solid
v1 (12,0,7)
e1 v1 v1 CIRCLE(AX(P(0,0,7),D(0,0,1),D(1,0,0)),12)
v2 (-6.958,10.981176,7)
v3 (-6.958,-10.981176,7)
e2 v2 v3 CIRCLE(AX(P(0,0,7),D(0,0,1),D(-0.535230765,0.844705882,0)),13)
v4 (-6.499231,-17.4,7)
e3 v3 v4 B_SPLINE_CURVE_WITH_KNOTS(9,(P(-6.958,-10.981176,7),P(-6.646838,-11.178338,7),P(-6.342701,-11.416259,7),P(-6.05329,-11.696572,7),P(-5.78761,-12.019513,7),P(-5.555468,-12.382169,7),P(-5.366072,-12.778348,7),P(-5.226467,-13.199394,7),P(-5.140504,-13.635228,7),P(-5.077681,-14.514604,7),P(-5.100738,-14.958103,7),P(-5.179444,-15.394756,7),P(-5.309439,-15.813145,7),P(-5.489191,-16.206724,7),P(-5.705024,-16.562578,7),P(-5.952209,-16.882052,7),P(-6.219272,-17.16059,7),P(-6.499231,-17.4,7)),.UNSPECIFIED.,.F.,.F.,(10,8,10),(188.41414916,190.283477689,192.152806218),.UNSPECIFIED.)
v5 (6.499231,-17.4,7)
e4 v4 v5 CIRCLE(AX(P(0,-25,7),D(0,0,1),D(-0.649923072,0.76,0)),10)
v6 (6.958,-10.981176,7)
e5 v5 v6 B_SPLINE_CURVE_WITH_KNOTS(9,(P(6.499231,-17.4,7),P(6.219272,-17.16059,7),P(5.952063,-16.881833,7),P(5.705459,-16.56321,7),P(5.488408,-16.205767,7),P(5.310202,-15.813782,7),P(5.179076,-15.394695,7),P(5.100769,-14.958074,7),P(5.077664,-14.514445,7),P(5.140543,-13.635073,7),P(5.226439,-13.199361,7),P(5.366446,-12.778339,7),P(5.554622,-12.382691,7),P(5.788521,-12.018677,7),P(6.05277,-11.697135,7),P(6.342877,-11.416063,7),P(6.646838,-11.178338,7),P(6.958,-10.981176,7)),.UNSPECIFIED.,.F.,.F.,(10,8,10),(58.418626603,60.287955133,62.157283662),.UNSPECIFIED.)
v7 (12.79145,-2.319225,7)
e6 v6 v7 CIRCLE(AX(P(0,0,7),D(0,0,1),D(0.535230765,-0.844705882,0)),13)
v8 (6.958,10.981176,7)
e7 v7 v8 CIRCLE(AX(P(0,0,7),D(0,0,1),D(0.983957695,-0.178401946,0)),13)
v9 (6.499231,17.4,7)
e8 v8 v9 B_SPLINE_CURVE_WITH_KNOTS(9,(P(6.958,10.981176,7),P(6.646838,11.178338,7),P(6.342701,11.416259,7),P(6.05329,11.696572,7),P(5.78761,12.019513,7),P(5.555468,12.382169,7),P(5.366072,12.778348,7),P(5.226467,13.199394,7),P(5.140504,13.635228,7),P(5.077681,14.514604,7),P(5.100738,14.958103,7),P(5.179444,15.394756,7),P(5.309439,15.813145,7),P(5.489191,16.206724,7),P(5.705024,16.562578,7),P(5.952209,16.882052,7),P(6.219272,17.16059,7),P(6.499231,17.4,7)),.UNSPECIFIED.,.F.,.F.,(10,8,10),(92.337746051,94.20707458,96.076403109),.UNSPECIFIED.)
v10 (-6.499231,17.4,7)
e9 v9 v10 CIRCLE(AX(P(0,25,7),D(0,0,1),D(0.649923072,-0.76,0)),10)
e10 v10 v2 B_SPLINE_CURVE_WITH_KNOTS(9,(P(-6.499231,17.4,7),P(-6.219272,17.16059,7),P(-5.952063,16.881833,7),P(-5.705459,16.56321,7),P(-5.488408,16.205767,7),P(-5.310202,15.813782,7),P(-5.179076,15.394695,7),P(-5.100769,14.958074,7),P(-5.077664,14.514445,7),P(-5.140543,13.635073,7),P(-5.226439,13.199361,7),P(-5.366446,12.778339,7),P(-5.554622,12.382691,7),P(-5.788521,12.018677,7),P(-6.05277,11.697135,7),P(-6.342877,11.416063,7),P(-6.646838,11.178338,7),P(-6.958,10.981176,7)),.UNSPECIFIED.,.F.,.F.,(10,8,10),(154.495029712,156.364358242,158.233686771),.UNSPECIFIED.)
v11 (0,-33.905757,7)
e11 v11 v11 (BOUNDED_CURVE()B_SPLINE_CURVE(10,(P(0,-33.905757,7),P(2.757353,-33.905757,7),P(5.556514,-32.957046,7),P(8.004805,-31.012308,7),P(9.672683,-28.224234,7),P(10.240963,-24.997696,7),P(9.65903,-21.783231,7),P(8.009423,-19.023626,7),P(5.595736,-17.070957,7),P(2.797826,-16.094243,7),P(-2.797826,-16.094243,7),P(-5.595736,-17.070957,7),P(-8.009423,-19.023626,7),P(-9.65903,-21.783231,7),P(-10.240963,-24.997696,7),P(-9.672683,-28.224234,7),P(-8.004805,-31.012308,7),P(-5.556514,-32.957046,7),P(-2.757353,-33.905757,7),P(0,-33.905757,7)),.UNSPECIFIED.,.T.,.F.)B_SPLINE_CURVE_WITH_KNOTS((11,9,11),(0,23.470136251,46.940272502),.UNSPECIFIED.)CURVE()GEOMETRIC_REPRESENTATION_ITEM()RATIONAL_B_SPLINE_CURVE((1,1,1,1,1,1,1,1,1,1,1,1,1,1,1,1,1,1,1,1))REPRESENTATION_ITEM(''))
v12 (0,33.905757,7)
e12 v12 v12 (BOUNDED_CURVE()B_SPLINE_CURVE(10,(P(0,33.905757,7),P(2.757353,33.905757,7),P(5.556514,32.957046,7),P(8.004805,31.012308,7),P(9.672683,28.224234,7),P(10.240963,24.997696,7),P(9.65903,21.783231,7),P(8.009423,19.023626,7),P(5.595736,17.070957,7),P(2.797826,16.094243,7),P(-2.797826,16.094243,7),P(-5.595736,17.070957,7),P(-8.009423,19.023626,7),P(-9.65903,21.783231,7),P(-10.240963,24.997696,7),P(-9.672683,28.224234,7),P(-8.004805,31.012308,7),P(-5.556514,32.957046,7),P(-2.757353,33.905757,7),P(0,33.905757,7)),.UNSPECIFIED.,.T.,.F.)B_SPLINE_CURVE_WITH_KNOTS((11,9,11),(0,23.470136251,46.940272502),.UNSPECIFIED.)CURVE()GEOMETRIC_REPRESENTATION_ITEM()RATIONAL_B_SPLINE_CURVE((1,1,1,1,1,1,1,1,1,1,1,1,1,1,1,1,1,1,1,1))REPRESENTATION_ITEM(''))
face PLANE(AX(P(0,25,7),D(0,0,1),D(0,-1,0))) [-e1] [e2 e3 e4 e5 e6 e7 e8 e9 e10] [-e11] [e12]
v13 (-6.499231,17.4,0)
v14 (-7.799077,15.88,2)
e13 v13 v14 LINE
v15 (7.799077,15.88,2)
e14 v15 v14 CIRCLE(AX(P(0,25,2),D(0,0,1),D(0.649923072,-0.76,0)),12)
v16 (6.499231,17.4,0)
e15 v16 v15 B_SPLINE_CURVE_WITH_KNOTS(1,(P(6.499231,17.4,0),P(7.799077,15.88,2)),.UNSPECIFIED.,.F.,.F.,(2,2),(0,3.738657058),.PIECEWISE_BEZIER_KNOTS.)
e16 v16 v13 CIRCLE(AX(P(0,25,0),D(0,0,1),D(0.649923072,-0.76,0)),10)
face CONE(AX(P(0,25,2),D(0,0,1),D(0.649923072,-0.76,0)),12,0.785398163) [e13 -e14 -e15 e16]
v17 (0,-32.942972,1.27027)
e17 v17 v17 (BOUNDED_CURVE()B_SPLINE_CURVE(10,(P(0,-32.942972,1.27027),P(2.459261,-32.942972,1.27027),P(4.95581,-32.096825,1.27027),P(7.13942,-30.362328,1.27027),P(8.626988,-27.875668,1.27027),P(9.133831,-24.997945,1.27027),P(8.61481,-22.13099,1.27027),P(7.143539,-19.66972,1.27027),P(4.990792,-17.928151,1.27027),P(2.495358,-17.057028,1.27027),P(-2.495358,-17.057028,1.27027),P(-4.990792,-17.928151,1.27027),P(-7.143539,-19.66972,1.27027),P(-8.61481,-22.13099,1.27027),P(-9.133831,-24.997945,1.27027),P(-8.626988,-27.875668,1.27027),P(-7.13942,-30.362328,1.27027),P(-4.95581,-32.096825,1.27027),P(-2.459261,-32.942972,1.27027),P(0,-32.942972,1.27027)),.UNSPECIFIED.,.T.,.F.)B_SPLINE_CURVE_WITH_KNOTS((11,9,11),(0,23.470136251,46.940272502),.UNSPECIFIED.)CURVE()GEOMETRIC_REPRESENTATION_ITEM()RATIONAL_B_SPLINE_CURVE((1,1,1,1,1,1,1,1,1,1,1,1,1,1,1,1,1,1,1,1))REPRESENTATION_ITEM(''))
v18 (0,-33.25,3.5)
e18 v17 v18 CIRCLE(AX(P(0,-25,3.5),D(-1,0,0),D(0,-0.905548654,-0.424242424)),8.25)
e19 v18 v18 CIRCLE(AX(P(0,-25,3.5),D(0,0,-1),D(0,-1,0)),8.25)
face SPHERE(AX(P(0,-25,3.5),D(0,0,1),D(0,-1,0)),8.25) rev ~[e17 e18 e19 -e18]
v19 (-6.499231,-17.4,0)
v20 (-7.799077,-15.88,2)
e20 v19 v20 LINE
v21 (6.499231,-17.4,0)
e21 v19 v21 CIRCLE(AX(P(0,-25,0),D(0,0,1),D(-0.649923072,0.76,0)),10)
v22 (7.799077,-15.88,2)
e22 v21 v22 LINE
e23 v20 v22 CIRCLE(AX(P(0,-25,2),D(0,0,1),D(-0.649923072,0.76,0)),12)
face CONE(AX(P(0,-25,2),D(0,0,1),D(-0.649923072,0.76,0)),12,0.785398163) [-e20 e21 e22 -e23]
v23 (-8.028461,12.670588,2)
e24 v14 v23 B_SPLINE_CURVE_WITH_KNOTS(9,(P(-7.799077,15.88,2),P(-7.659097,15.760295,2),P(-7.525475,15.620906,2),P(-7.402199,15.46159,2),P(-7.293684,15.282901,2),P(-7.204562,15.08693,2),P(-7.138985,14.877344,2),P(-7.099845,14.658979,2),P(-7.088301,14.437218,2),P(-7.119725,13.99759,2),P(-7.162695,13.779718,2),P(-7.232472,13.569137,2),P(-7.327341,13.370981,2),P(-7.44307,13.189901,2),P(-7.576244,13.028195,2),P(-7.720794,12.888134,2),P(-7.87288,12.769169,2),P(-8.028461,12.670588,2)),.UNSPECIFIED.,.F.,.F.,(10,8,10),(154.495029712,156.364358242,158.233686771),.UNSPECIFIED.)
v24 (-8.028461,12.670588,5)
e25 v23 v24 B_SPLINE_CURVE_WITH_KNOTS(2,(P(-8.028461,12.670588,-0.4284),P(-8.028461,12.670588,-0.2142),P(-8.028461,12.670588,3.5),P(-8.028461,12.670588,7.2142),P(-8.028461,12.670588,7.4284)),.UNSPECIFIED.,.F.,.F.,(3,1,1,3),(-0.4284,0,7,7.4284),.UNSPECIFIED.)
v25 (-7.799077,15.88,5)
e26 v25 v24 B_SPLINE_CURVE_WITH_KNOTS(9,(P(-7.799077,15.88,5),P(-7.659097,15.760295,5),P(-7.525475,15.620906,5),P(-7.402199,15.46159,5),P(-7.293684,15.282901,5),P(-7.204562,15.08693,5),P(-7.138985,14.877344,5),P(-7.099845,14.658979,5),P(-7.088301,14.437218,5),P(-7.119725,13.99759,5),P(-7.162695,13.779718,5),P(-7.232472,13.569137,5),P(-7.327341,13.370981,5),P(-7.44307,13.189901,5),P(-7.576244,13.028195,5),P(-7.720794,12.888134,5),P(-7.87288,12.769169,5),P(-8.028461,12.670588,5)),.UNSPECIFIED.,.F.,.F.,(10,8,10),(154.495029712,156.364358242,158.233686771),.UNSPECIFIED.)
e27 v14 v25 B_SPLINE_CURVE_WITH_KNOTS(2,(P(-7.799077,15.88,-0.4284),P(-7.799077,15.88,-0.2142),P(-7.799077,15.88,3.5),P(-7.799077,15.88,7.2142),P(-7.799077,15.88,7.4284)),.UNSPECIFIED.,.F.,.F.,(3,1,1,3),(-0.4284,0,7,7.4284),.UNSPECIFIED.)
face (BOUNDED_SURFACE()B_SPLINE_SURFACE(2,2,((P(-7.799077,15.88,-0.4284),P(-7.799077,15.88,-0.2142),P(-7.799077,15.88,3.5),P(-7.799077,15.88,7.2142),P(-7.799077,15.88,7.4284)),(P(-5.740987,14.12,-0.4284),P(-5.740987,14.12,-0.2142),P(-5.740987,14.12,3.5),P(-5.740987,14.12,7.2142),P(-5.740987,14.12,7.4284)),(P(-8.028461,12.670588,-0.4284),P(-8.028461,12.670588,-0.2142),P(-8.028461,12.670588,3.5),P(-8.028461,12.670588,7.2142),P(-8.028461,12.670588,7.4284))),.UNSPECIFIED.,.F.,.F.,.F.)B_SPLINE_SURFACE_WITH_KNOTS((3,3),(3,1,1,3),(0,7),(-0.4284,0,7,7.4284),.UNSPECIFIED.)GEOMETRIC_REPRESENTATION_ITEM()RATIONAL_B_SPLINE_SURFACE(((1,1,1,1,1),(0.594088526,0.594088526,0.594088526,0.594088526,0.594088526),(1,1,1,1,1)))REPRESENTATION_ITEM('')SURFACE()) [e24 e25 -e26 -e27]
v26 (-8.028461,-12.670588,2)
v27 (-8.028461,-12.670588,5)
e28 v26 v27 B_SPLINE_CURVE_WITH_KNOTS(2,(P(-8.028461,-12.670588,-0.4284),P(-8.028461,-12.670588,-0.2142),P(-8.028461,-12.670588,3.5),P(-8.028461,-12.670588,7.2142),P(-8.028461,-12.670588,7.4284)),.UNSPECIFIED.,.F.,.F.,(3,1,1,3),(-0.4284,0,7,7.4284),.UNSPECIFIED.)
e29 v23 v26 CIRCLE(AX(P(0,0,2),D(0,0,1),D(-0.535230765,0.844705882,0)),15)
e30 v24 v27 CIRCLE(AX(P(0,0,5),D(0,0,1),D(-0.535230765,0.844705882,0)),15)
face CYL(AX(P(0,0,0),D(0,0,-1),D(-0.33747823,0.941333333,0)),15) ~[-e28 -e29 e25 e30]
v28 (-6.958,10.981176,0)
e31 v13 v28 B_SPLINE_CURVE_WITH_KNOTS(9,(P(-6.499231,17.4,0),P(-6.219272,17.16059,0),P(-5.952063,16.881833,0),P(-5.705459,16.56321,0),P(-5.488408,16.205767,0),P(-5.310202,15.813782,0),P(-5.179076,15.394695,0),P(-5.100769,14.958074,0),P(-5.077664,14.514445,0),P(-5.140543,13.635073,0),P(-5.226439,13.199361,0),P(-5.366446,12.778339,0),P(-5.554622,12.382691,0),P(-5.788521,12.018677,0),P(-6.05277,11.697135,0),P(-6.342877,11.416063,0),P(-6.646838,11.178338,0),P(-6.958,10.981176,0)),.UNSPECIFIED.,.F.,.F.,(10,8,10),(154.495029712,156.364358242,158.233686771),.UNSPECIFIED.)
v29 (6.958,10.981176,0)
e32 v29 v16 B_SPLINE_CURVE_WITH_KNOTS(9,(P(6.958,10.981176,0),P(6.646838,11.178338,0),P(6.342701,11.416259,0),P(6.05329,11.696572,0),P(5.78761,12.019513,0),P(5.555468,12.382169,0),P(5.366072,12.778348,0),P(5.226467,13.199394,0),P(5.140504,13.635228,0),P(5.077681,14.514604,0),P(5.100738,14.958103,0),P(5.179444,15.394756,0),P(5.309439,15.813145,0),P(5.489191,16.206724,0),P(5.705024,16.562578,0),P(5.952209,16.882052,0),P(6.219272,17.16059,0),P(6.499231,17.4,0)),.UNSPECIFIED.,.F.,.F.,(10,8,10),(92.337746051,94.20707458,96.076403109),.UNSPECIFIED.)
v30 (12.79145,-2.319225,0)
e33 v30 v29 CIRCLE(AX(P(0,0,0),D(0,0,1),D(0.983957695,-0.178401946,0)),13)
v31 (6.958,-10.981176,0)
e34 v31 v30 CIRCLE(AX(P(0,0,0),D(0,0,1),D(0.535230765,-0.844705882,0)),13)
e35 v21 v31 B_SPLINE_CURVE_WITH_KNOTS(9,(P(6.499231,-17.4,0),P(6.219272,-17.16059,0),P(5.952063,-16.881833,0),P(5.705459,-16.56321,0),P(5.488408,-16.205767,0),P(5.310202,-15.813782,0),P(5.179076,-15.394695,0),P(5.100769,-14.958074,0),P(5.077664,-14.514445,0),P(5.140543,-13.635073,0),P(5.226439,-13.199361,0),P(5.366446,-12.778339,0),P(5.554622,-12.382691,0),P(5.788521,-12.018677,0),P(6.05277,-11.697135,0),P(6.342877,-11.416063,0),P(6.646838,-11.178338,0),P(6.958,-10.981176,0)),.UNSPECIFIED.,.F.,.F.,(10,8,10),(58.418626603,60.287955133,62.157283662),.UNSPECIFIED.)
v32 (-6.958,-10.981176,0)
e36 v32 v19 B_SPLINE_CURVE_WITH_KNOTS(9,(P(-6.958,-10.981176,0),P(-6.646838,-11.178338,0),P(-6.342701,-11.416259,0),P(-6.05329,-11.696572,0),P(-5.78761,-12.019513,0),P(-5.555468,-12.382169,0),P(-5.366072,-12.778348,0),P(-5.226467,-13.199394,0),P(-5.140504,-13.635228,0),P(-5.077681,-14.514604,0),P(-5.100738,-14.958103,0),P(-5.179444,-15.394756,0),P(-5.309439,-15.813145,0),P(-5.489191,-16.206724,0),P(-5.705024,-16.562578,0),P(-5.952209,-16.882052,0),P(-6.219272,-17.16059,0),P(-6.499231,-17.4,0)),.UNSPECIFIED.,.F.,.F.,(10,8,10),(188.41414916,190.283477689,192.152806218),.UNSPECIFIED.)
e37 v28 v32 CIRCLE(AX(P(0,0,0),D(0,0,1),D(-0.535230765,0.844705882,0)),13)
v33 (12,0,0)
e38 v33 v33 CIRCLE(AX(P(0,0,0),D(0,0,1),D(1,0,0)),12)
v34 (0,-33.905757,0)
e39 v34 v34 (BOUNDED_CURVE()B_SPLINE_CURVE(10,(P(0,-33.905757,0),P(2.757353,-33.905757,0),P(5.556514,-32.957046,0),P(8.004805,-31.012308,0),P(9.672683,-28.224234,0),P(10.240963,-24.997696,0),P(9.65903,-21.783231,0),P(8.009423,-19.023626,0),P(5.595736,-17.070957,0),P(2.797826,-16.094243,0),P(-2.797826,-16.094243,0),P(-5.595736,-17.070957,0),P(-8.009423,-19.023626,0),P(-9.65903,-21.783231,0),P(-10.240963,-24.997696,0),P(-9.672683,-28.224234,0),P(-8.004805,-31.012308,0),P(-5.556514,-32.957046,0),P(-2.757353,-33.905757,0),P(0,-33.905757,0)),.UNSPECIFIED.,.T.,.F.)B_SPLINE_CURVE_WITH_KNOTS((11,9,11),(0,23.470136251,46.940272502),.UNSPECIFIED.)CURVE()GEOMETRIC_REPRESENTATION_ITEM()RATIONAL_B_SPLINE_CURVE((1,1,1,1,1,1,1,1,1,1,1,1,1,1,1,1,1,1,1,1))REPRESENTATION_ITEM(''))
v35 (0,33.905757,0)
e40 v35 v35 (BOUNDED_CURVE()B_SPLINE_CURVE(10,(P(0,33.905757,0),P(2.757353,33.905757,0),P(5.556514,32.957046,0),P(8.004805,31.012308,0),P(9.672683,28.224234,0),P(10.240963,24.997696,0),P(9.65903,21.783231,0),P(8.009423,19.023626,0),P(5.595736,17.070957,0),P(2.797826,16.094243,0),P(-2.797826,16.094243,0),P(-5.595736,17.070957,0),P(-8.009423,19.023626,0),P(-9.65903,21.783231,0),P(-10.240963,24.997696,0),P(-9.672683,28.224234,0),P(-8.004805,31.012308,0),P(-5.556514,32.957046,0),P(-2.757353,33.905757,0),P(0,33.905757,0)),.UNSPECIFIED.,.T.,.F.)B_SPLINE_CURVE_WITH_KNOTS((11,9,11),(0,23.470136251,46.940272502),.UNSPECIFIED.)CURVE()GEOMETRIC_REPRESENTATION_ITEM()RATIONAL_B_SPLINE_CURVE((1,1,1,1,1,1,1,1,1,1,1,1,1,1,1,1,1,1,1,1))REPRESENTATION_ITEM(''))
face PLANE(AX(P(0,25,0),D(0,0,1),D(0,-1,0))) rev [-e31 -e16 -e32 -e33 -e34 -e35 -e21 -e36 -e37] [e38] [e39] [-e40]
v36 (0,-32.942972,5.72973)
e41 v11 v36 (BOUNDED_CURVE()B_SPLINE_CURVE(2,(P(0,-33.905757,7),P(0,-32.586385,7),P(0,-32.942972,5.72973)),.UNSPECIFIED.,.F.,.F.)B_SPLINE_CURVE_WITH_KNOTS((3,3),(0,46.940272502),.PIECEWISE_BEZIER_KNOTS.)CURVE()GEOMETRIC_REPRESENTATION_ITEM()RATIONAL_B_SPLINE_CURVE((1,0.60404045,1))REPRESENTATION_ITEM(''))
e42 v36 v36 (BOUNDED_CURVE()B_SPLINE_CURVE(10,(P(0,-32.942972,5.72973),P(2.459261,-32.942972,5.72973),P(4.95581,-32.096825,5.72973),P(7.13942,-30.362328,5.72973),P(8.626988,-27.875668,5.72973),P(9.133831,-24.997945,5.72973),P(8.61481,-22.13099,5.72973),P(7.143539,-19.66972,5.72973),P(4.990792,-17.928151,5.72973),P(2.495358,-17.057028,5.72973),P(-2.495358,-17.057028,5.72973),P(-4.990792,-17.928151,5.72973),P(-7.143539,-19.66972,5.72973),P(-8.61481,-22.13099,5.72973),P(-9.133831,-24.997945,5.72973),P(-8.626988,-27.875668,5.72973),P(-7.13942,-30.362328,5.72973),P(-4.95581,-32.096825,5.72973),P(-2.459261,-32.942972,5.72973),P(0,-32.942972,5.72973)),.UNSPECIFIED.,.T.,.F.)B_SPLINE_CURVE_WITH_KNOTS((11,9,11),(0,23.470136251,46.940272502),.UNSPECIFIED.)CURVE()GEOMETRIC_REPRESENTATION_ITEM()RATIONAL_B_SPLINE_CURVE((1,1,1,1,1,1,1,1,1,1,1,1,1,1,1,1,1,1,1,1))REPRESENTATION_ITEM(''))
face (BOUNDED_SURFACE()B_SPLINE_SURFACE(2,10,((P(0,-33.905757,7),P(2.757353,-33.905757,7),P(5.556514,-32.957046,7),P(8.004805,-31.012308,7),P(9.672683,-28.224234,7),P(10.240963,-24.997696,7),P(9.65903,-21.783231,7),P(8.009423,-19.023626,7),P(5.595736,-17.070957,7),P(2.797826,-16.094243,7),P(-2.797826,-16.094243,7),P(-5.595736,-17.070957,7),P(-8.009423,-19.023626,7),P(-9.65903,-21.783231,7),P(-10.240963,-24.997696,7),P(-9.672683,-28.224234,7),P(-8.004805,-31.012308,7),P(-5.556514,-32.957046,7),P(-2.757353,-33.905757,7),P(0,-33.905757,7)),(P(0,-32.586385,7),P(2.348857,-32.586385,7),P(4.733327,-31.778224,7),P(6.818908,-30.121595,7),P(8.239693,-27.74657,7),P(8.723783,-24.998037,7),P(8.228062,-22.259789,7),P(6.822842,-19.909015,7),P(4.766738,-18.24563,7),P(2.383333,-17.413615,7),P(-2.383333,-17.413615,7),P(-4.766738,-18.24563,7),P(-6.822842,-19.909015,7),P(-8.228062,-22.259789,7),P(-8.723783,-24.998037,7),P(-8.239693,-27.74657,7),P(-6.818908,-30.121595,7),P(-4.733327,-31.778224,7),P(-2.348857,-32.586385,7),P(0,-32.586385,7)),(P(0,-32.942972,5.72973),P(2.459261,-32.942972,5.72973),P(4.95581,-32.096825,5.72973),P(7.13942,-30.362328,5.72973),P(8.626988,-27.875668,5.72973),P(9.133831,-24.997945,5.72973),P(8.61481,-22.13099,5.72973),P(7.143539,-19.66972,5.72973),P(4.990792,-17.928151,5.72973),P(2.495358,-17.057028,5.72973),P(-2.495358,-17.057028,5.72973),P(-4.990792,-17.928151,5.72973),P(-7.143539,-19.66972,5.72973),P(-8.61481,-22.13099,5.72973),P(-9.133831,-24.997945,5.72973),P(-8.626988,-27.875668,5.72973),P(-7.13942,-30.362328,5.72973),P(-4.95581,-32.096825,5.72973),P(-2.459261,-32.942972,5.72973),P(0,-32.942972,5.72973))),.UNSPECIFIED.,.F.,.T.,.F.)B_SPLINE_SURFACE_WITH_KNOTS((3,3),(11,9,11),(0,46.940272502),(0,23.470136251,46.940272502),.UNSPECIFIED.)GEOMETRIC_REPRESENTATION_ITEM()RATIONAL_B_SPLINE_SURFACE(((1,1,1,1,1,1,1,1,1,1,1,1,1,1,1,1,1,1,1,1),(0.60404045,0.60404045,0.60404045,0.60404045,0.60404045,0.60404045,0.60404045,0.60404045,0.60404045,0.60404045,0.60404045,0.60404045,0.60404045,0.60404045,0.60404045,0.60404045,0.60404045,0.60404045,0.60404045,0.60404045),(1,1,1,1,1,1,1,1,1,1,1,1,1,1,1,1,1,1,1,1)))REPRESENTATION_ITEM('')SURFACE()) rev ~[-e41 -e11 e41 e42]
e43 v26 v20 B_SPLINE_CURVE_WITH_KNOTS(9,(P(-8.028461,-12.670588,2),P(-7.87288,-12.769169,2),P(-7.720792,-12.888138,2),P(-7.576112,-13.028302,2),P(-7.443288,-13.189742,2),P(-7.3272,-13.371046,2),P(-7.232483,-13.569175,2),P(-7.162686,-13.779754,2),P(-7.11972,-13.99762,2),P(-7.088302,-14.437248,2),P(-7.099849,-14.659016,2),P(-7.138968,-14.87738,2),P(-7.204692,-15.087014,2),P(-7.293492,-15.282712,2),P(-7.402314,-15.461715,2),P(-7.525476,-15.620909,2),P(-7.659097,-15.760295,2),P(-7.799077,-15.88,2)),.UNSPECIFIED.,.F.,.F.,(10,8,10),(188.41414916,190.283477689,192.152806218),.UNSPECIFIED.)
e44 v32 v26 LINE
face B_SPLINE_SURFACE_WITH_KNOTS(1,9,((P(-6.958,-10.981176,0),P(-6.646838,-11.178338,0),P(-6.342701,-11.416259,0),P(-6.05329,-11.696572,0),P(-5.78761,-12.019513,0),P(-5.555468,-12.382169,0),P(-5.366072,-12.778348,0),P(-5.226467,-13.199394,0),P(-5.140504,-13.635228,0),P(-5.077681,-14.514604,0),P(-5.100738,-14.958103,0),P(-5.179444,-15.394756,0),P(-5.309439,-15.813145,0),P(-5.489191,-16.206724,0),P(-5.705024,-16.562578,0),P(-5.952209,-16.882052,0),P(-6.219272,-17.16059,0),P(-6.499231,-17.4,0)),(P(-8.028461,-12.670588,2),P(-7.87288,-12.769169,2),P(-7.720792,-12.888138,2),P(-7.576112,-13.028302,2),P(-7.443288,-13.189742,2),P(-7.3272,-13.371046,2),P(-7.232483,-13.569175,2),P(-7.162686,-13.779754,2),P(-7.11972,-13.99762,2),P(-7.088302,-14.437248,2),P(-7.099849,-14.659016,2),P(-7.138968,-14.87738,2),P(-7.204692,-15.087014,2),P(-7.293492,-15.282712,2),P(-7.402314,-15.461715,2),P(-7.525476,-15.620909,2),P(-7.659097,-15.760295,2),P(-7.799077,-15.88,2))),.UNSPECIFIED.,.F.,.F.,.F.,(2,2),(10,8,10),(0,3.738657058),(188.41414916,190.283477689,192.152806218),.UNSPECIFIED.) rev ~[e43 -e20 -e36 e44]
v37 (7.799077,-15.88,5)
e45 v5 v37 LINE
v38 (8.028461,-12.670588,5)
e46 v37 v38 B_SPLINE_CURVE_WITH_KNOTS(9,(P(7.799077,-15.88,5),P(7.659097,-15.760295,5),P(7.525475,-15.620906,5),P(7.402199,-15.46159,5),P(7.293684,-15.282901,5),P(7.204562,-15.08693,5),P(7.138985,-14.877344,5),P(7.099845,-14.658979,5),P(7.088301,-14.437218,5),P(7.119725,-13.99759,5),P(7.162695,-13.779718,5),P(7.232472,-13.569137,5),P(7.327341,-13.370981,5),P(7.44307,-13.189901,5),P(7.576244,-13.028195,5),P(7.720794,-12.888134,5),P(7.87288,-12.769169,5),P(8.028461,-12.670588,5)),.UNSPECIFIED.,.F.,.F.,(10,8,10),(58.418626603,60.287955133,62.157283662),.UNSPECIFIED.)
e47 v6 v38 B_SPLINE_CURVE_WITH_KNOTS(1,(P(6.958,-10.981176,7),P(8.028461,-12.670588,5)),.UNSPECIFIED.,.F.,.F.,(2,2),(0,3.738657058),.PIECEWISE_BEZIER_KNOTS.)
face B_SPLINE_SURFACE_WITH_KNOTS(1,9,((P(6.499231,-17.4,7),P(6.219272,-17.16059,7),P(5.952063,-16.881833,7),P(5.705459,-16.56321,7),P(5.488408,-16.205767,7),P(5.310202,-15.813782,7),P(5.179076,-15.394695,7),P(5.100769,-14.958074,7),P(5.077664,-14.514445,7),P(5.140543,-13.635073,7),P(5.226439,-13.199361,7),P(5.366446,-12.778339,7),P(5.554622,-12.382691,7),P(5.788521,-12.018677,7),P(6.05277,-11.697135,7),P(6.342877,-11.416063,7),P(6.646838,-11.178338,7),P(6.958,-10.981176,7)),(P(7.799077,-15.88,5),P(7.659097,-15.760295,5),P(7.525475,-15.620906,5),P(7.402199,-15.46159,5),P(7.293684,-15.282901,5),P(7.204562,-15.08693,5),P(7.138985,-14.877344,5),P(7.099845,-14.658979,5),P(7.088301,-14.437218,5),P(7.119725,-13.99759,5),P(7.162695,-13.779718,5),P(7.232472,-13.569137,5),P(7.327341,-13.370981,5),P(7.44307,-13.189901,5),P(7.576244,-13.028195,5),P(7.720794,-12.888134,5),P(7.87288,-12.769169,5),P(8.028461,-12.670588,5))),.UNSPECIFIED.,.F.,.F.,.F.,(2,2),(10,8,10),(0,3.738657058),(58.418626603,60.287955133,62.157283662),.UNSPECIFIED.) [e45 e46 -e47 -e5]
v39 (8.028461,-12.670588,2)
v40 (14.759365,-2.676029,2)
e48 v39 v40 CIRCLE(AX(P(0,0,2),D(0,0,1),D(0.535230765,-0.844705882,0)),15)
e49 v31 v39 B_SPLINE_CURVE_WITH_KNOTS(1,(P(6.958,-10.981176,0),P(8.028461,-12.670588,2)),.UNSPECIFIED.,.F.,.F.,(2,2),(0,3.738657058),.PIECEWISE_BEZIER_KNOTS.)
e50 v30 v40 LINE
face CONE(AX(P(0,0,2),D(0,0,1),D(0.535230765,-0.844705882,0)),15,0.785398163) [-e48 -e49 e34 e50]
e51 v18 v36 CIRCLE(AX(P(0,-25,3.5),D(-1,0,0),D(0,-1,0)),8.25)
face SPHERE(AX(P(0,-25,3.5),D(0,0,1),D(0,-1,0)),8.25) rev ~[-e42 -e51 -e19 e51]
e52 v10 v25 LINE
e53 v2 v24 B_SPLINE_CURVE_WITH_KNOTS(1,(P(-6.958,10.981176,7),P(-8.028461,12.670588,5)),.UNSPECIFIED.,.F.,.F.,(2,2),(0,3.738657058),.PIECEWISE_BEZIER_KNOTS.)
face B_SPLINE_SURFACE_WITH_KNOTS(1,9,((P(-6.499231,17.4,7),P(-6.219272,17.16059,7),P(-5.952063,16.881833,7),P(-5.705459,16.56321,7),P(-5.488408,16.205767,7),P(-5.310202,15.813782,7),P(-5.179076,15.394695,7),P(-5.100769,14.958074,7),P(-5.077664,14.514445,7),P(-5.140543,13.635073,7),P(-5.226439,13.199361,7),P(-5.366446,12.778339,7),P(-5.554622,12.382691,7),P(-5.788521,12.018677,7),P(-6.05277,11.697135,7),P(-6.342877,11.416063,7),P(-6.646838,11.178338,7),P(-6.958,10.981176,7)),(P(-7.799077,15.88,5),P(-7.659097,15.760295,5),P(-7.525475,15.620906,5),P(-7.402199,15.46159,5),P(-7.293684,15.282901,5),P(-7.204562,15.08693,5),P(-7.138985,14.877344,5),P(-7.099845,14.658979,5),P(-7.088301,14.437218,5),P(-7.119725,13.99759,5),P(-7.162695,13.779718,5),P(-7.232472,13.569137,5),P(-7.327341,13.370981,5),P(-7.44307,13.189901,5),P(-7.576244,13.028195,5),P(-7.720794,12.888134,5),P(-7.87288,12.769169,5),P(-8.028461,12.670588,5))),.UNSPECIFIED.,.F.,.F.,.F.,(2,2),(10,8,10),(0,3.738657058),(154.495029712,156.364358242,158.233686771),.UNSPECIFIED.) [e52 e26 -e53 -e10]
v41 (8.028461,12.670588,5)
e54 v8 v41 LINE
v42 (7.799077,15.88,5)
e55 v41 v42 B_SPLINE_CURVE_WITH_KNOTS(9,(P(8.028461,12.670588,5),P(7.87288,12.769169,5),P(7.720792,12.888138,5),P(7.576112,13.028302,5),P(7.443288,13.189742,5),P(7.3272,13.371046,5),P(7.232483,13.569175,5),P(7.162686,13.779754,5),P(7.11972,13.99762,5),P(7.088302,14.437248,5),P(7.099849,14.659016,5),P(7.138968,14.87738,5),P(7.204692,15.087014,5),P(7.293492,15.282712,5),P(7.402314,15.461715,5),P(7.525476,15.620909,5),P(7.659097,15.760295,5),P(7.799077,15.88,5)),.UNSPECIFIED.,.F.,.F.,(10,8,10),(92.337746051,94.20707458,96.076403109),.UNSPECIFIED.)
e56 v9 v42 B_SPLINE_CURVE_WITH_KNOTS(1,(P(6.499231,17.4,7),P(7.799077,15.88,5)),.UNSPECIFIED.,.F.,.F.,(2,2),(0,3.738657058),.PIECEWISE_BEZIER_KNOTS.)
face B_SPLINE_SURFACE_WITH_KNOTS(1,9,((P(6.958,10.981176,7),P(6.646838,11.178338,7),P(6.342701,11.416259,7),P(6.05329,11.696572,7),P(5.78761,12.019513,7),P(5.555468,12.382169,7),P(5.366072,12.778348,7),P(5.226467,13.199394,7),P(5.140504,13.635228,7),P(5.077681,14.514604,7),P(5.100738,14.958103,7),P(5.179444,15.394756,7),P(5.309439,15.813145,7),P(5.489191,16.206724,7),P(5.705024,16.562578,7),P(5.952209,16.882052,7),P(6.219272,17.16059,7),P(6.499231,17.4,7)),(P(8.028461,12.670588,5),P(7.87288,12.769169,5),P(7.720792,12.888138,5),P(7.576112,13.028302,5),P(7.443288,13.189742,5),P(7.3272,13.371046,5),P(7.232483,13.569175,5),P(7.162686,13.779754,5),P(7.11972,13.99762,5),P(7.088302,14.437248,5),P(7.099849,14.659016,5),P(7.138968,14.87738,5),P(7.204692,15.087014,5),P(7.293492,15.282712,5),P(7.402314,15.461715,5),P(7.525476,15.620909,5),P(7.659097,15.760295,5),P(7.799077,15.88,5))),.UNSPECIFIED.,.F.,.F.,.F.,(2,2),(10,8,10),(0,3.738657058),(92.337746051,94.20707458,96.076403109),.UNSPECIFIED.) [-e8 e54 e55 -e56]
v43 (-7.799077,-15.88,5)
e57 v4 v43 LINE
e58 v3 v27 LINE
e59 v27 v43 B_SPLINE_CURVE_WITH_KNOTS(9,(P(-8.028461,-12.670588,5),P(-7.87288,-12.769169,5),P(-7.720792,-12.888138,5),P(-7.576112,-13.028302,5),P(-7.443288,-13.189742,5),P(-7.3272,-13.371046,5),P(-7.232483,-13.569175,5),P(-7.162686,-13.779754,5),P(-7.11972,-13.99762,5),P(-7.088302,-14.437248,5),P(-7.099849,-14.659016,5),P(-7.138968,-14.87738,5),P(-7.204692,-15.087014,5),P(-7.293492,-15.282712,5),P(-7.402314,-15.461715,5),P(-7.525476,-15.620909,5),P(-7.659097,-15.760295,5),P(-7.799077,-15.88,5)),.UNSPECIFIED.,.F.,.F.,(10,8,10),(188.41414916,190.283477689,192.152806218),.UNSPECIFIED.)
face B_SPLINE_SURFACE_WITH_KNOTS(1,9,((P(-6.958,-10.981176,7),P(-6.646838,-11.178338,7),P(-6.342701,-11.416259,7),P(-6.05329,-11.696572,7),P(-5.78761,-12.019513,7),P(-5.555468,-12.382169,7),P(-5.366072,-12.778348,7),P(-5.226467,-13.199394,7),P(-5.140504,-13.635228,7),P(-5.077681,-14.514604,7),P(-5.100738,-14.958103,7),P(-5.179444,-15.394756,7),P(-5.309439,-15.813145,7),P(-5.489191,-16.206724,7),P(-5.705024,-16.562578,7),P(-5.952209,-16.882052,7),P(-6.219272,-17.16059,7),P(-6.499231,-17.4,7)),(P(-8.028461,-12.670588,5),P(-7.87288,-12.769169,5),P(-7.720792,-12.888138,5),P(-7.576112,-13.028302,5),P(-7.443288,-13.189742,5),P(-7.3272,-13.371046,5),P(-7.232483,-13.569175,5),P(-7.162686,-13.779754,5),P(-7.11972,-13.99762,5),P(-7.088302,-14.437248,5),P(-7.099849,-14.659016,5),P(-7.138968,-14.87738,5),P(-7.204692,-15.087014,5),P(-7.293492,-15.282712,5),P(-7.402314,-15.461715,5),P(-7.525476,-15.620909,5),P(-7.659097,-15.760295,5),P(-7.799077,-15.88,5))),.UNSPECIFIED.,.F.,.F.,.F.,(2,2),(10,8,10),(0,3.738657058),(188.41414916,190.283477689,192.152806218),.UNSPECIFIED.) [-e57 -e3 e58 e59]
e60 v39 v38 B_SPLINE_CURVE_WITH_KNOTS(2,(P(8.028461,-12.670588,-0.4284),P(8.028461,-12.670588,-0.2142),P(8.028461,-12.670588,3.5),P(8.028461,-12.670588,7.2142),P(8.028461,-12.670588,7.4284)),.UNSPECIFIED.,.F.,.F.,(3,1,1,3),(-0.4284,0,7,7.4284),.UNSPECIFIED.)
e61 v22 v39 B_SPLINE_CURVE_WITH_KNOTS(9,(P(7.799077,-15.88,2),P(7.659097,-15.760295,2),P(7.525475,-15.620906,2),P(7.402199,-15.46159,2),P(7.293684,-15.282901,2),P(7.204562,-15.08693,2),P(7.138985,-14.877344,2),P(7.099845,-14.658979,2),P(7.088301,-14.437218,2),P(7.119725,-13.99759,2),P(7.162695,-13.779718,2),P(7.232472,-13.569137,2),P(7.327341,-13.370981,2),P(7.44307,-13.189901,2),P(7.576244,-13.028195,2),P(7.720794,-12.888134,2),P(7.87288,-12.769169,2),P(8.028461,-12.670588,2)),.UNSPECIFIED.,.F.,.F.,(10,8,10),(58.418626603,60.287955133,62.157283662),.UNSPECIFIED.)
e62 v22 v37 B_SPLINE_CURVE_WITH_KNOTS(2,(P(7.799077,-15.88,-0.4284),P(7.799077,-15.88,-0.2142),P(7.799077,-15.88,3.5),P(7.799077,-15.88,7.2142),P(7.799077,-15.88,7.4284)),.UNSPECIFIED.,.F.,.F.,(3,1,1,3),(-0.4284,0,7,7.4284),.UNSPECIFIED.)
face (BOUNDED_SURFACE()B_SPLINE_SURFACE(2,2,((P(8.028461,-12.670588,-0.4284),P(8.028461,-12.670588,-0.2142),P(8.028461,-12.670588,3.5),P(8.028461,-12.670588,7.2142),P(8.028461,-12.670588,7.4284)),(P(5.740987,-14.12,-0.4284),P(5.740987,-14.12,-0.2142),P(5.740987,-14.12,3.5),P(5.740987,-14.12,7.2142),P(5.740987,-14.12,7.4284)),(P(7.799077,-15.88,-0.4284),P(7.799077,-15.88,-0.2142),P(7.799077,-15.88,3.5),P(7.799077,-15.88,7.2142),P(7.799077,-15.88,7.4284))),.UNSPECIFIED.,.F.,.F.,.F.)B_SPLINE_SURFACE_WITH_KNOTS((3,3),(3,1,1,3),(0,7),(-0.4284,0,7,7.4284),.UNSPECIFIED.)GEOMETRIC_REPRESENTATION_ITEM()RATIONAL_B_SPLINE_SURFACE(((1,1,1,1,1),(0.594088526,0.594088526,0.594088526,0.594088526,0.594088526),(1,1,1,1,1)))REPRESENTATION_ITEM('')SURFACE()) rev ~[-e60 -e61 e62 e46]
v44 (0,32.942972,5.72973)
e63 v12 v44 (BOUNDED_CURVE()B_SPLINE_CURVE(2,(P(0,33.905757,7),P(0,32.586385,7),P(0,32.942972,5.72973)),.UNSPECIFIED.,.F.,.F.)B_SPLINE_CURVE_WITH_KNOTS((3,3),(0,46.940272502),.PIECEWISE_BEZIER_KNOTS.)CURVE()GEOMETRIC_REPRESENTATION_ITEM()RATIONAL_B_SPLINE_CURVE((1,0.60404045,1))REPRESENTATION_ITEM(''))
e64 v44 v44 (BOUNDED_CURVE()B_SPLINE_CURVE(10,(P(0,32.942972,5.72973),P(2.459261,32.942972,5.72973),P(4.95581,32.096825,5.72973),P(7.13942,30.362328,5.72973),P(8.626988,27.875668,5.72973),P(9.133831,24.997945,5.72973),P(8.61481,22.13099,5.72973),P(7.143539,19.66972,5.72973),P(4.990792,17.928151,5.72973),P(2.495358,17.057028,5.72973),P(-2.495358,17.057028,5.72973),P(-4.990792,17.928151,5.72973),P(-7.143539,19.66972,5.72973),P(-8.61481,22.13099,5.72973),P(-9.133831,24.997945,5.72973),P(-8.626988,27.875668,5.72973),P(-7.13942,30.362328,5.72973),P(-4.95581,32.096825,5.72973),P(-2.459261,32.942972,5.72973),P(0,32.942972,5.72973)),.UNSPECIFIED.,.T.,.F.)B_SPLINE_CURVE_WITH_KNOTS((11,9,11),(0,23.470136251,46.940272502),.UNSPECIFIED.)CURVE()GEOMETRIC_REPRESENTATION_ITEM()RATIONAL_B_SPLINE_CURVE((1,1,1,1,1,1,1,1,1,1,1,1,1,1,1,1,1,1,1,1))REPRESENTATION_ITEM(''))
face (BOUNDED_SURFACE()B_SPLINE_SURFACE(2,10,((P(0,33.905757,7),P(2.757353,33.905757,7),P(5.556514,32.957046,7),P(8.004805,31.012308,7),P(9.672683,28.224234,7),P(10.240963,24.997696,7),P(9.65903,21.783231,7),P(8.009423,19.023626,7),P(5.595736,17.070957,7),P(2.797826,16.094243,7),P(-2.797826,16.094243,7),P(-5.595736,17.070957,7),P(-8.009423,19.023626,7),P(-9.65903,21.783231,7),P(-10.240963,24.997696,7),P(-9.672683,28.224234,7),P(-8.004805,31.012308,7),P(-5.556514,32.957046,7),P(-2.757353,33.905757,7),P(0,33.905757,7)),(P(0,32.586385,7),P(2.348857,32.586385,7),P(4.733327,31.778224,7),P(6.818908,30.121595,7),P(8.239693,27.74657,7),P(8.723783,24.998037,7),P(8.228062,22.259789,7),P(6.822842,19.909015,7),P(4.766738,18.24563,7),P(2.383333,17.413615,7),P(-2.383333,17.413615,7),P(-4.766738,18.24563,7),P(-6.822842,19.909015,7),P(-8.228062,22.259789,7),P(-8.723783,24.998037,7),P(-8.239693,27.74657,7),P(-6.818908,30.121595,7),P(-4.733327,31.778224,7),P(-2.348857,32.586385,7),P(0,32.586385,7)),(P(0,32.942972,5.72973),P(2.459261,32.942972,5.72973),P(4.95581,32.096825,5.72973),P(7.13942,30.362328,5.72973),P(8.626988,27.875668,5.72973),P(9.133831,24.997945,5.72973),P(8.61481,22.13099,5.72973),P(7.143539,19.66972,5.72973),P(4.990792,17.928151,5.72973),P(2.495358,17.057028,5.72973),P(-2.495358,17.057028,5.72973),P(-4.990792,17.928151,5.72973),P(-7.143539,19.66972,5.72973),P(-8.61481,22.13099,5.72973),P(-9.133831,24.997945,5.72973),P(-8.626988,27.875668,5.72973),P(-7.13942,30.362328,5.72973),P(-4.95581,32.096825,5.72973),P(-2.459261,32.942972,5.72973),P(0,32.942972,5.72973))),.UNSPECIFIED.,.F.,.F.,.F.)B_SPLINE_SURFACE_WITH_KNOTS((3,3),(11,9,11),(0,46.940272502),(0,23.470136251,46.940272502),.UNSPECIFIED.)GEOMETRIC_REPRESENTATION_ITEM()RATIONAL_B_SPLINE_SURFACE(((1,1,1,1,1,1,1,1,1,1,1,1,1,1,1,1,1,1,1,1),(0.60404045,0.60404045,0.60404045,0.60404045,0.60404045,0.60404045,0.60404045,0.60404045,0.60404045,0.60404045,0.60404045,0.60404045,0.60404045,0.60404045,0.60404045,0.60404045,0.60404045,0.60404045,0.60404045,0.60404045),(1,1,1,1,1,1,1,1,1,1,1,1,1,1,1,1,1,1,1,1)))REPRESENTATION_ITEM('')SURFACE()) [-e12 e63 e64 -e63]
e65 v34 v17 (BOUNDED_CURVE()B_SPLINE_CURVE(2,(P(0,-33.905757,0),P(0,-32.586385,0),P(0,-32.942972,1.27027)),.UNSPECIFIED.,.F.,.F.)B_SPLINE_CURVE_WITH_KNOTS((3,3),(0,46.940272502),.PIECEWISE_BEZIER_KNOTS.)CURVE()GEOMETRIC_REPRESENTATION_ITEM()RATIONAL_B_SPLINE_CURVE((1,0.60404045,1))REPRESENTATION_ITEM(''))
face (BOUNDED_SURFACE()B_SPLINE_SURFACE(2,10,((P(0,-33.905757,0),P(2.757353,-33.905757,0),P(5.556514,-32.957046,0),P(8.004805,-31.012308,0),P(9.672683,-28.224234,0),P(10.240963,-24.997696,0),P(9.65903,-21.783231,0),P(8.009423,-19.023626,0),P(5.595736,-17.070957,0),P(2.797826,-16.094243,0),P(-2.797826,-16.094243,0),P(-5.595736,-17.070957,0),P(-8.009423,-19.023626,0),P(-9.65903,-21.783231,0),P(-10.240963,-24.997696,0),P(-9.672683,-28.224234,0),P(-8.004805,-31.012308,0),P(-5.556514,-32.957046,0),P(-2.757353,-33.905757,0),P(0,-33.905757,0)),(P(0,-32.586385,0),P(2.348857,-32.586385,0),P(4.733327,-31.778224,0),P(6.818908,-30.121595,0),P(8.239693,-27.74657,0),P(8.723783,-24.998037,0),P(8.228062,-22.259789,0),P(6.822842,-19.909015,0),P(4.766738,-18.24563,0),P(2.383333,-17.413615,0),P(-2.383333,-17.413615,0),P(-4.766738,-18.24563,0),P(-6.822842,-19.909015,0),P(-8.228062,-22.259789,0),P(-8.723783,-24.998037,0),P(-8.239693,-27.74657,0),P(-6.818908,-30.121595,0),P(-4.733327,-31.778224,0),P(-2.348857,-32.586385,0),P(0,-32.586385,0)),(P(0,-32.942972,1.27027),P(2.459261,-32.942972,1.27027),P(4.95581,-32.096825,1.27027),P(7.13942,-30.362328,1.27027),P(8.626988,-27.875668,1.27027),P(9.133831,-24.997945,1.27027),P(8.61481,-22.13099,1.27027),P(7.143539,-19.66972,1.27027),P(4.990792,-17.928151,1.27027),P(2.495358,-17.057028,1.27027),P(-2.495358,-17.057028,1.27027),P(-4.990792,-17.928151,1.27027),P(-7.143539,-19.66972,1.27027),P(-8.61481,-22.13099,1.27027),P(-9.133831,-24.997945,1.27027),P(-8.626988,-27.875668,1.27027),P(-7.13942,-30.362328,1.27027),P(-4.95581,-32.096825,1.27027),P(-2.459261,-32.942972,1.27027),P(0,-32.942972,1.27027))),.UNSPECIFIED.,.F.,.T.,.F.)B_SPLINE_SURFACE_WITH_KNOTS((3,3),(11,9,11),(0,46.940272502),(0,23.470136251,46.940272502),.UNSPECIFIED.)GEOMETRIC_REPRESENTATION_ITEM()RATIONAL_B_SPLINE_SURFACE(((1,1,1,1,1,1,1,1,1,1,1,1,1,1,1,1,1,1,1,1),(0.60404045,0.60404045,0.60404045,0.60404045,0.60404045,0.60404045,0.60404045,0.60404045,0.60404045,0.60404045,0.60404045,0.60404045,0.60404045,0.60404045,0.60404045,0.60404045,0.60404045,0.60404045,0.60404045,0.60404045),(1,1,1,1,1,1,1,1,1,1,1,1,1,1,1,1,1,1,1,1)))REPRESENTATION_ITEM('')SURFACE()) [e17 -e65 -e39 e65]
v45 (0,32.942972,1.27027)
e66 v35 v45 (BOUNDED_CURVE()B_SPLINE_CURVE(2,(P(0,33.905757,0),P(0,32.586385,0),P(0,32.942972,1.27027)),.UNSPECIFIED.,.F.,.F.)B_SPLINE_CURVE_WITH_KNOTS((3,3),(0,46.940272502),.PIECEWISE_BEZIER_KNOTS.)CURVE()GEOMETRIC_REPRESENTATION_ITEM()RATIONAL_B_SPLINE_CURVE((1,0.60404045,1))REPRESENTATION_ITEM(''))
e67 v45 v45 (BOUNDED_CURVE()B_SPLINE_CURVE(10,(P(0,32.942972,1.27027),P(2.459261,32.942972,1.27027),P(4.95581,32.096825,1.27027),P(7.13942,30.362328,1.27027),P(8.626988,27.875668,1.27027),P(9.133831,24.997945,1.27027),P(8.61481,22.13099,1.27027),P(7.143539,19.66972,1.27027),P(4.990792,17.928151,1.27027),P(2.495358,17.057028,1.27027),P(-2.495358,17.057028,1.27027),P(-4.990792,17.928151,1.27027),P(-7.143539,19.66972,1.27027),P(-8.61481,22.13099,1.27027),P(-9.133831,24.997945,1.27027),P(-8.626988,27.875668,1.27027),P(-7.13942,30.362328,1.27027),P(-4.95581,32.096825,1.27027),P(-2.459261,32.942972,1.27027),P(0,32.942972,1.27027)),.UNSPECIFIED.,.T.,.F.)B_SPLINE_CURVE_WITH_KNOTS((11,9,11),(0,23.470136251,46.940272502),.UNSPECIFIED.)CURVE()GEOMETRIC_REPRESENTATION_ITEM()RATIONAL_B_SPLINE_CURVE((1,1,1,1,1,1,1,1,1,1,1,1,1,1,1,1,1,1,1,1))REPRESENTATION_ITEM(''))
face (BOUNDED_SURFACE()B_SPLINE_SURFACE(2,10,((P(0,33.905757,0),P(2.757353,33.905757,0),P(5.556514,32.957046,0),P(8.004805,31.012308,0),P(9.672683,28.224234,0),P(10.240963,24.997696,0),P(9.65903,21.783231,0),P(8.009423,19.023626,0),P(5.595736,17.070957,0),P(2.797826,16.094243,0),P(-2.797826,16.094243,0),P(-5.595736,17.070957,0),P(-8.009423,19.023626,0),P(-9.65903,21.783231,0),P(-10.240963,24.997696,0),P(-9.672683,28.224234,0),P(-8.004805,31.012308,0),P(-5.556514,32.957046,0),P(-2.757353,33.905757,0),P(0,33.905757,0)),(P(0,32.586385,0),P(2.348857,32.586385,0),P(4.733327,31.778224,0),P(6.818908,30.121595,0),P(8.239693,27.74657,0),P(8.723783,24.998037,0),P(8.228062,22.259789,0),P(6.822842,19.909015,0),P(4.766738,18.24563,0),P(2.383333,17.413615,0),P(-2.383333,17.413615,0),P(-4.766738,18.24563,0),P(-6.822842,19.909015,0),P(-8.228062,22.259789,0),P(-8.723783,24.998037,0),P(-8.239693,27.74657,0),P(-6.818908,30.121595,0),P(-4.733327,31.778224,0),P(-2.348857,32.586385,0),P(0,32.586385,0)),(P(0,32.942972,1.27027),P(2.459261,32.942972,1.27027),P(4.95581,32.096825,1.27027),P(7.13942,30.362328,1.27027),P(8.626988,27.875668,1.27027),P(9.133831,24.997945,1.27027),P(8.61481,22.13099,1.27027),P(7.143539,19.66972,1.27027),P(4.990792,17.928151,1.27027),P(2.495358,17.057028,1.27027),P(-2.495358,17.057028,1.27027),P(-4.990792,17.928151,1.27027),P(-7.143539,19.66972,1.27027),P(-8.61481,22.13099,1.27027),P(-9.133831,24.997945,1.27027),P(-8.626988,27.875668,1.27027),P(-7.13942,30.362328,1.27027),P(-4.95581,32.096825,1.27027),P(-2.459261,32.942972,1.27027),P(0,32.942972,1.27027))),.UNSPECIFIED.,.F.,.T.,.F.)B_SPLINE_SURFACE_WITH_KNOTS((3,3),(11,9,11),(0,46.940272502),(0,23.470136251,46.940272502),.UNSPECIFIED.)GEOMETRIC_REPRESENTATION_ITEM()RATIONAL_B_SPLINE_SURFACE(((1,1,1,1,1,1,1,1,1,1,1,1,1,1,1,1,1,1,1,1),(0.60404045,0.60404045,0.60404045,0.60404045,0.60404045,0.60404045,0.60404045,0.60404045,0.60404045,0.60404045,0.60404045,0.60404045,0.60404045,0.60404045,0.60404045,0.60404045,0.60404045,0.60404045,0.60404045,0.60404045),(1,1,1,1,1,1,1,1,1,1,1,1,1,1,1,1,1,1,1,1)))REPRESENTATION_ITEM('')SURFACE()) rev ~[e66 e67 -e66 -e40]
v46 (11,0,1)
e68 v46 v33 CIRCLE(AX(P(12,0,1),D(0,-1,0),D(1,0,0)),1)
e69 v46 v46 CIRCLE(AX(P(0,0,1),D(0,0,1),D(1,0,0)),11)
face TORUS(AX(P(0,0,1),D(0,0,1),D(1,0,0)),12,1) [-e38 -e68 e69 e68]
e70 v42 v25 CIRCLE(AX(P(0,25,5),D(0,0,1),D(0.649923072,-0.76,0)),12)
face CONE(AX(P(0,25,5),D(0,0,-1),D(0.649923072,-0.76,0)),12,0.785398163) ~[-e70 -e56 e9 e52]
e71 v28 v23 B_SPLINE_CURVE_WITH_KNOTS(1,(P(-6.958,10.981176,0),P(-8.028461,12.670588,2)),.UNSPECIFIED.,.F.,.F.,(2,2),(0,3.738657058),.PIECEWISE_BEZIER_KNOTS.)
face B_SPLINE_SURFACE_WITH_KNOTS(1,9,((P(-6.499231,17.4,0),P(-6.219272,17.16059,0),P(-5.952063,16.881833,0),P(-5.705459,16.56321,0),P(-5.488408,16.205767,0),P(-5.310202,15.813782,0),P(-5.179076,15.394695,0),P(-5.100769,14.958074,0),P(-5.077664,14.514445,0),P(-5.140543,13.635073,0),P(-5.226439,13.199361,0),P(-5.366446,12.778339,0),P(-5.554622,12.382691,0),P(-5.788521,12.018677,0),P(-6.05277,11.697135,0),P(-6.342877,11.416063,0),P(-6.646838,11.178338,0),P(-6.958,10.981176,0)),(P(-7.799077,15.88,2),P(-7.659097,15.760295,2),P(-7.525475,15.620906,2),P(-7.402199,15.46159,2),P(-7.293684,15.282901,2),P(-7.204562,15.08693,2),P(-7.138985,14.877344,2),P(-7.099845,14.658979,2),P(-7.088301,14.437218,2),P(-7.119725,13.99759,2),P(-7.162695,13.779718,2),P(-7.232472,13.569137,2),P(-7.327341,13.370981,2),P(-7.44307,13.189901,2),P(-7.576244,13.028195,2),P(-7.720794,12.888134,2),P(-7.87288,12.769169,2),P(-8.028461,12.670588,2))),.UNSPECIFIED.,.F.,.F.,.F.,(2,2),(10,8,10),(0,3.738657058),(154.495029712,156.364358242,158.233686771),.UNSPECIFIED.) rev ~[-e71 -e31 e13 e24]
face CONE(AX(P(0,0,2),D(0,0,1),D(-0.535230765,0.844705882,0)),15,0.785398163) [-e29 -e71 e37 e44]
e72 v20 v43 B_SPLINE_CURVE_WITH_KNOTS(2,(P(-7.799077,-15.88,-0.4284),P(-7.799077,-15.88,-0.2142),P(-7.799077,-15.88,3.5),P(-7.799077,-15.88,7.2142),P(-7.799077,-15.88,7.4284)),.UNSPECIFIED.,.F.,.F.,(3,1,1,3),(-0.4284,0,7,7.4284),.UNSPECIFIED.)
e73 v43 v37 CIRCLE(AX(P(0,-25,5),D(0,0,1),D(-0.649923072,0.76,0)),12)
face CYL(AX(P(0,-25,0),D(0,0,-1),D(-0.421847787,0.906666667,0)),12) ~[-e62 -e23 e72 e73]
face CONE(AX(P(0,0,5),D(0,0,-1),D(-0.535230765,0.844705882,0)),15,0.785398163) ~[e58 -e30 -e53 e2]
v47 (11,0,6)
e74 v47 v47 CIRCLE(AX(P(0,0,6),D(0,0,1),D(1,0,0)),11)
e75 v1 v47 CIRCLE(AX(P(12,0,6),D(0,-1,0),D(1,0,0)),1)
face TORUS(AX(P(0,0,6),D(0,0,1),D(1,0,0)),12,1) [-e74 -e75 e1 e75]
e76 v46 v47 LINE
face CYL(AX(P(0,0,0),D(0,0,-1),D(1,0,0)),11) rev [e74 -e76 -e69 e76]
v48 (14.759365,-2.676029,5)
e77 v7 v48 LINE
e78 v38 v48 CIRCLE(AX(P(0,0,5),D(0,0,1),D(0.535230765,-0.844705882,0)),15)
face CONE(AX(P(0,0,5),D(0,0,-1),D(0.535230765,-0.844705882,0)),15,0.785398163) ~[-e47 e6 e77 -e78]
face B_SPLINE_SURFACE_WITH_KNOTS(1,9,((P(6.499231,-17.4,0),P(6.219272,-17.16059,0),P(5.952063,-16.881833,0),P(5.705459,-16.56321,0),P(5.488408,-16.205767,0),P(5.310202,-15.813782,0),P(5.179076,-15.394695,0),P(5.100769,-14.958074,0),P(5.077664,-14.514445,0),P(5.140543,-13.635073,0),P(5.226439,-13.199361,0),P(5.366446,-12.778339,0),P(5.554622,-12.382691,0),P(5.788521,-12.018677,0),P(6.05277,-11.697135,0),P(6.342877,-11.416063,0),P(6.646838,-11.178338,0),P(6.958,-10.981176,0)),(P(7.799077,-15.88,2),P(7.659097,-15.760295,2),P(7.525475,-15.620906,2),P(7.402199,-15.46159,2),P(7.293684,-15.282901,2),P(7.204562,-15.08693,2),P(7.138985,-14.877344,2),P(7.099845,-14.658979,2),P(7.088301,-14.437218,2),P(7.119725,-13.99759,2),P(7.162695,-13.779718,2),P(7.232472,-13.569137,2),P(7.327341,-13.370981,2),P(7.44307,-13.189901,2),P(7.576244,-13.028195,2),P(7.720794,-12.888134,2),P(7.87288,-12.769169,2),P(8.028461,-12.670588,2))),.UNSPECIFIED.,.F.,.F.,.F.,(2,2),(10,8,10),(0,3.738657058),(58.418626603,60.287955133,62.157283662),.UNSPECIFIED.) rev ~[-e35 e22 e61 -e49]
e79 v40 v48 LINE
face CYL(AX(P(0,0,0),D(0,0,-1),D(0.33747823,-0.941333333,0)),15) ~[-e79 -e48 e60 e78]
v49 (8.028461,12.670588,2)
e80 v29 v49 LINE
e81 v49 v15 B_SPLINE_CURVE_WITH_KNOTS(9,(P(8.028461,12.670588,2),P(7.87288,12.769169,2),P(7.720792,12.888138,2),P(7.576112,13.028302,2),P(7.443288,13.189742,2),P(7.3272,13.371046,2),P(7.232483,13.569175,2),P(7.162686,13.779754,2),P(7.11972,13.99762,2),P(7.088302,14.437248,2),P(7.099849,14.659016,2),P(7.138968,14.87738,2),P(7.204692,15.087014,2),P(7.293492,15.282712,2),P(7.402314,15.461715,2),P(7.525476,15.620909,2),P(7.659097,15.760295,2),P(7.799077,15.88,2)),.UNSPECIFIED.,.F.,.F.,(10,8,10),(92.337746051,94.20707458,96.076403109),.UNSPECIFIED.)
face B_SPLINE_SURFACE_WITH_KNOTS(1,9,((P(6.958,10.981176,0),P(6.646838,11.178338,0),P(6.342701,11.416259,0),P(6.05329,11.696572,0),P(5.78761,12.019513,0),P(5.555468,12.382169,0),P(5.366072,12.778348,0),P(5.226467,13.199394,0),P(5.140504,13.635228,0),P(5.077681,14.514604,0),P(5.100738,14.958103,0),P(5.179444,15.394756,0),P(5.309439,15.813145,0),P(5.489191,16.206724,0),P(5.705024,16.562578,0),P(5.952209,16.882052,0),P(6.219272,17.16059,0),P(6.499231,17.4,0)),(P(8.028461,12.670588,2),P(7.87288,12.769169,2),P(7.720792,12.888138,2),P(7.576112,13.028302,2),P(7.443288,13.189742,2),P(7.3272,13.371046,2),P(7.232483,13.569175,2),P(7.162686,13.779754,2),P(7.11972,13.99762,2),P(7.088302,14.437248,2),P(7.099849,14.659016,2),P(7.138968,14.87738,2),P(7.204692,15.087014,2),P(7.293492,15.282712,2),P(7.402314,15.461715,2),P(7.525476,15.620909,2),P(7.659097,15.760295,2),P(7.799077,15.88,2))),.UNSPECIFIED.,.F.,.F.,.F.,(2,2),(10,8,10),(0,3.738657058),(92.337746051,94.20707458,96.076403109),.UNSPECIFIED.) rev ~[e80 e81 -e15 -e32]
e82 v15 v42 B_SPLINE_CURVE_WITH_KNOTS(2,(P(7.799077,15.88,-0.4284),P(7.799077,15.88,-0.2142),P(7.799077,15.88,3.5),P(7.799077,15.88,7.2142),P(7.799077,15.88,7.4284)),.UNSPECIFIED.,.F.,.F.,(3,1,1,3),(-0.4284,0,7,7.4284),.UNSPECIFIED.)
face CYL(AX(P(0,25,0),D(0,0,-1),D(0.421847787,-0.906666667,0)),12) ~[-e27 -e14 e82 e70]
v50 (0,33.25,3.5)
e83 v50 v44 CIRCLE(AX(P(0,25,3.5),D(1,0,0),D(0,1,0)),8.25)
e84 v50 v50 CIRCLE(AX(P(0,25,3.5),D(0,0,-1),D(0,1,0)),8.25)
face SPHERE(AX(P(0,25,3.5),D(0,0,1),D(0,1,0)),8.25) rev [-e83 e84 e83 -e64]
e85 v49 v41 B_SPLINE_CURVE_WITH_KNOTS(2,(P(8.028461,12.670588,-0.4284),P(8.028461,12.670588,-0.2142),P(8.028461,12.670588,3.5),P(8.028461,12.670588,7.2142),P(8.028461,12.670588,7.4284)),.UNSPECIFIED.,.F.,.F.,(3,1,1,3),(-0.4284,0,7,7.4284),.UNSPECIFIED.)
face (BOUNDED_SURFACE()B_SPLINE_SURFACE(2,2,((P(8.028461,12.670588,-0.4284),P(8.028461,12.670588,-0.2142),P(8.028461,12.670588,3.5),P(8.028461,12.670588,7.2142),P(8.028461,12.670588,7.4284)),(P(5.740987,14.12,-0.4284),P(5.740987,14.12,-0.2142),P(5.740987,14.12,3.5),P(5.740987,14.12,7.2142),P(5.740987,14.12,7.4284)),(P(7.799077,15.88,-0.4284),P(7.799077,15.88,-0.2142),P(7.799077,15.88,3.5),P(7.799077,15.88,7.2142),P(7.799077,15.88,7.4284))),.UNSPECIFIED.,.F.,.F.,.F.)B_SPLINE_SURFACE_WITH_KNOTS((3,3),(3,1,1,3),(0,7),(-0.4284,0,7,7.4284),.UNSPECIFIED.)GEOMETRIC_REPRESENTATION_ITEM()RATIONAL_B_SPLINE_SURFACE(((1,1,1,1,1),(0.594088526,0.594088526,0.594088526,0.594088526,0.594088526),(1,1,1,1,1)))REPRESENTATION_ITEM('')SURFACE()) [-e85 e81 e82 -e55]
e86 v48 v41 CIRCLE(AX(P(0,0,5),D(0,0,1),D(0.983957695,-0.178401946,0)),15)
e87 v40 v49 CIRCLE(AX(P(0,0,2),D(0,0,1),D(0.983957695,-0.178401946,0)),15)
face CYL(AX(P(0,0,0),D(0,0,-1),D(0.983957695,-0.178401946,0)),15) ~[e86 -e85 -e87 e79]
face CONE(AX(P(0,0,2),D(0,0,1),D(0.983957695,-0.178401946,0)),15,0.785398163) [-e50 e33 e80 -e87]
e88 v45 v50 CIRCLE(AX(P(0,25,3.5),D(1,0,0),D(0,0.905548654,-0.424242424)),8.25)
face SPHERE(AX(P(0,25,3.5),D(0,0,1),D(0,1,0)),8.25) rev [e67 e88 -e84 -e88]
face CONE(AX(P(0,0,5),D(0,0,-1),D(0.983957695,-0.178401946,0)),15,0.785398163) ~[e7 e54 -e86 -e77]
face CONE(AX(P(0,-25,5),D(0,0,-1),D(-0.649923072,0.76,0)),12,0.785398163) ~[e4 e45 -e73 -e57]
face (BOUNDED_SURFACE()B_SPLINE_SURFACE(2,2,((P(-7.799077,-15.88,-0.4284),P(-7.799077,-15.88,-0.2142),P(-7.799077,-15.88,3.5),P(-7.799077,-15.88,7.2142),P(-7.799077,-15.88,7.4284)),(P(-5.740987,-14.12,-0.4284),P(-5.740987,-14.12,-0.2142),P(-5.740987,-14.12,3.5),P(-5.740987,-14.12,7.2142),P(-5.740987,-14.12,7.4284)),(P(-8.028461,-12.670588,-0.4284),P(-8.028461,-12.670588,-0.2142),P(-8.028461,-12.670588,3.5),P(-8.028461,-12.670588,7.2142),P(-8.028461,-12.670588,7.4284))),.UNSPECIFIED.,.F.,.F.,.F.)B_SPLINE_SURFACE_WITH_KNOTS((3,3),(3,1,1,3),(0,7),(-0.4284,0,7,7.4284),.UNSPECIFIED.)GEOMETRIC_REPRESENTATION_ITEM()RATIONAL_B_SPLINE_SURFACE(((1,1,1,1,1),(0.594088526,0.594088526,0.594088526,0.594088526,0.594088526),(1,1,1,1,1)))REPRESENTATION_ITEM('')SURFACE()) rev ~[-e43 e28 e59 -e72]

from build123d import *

# Parameters (mm, degrees)
F0_R     = 8.25
F0_R_2   = 11
F1_DEPTH = 7
F2_R     = 2
F3_SIZE  = 2
F9_R     = 1


# Not quite as in the source:
# - a pattern or mirror of a feature is missing from the dataset's text; its kind, count and spacing are read off the source's solid
# - a feature names something its author has since deleted; it is built from what else it names


with BuildPart() as f1:
    # F0 (on Top) → F1 (new body)
    with BuildSketch(Plane.XY):
        with BuildLine():
            ThreePointArc((14.7593654246, -2.6760291972), (12.9903810568, 7.5), (5.0621734463, 14.12))
            ThreePointArc((5.0621734463, 14.12), (0, 37), (-5.0621734463, 14.12))
            ThreePointArc((-5.0621734463, 14.12), (-15, 0), (-5.0621734463, -14.12))
            ThreePointArc((-5.0621734463, -14.12), (0, -37), (5.0621734463, -14.12))
            ThreePointArc((5.0621734463, -14.12), (11.4439708028, -9.6971919783), (14.7593654246, -2.6760291972))
        make_face()
        with Locations((0, -25)):
            Circle(F0_R, mode=Mode.SUBTRACT)
        Circle(F0_R_2, mode=Mode.SUBTRACT)
        with Locations((0, 25)):
            Circle(F0_R, mode=Mode.SUBTRACT)
    extrude(amount=F1_DEPTH)

    # F2
    f2_edges = [f1.edges().sort_by_distance(p)[0] for p in [
        (5.062173, -14.12, 3.5),
        (5.062173, 14.12, 3.5),
        (-5.062173, 14.12, 3.5),
        (-5.062173, -14.12, 3.5),
    ]]
    fillet(f2_edges, radius=F2_R)

    # F3
    f3_edges = [f1.edges().sort_by_distance(p)[0] for p in [
        (0, -37, 7),
        (0, -37, 0),
        (15, 0, 7),
        (15, 0, 0),
        (7.104012, 14.217419, 7),
        (7.104012, -14.217419, 7),
        (0, 37, 7),
        (-7.104012, 14.217419, 7),
        (-7.104012, -14.217419, 7),
        (-15, 0, 7),
        (7.104012, 14.217419, 0),
        (7.104012, -14.217419, 0),
        (0, 37, 0),
        (-7.104012, -14.217419, 0),
        (-7.104012, 14.217419, 0),
        (-15, 0, 0),
    ]]
    chamfer(f3_edges, length=F3_SIZE)

    # F7 (on 3pt) → F8 (revolve)
    with BuildSketch(Plane.YZ):
        with BuildLine():
            Line((-32.4707763987, 7), (-33.25, 7))
            Line((-33.25, 7), (-33.25, 3.5))
            ThreePointArc((-33.25, 3.5), (-33.0528381733, 5.2928461605), (-32.4707763987, 7))
        make_face()
        with BuildLine():
            ThreePointArc((-32.4707763987, 0), (-33.0528381733, 1.7071538395), (-33.25, 3.5))
            Line((-33.25, 3.5), (-33.25, 0))
            Line((-33.25, 0), (-32.4707763987, 0))
        make_face()
    f8 = revolve(axis=Axis((0, -25, 3.5), (0, 0, 1)))

    # F8_copies: F8 across plane
    add(f8.mirror(Plane.ZX))

    # F9
    f9_edges = [f1.edges().sort_by_distance(p)[0] for p in [
        (0, -17.529224, 7),
        (0, -17.529224, 0),
        (-11, 0, 0),
        (-11, 0, 7),
        (0, 17.529224, 7),
        (0, 17.529224, 0),
    ]]
    fillet(f9_edges, radius=F9_R)


solid = f1.part
